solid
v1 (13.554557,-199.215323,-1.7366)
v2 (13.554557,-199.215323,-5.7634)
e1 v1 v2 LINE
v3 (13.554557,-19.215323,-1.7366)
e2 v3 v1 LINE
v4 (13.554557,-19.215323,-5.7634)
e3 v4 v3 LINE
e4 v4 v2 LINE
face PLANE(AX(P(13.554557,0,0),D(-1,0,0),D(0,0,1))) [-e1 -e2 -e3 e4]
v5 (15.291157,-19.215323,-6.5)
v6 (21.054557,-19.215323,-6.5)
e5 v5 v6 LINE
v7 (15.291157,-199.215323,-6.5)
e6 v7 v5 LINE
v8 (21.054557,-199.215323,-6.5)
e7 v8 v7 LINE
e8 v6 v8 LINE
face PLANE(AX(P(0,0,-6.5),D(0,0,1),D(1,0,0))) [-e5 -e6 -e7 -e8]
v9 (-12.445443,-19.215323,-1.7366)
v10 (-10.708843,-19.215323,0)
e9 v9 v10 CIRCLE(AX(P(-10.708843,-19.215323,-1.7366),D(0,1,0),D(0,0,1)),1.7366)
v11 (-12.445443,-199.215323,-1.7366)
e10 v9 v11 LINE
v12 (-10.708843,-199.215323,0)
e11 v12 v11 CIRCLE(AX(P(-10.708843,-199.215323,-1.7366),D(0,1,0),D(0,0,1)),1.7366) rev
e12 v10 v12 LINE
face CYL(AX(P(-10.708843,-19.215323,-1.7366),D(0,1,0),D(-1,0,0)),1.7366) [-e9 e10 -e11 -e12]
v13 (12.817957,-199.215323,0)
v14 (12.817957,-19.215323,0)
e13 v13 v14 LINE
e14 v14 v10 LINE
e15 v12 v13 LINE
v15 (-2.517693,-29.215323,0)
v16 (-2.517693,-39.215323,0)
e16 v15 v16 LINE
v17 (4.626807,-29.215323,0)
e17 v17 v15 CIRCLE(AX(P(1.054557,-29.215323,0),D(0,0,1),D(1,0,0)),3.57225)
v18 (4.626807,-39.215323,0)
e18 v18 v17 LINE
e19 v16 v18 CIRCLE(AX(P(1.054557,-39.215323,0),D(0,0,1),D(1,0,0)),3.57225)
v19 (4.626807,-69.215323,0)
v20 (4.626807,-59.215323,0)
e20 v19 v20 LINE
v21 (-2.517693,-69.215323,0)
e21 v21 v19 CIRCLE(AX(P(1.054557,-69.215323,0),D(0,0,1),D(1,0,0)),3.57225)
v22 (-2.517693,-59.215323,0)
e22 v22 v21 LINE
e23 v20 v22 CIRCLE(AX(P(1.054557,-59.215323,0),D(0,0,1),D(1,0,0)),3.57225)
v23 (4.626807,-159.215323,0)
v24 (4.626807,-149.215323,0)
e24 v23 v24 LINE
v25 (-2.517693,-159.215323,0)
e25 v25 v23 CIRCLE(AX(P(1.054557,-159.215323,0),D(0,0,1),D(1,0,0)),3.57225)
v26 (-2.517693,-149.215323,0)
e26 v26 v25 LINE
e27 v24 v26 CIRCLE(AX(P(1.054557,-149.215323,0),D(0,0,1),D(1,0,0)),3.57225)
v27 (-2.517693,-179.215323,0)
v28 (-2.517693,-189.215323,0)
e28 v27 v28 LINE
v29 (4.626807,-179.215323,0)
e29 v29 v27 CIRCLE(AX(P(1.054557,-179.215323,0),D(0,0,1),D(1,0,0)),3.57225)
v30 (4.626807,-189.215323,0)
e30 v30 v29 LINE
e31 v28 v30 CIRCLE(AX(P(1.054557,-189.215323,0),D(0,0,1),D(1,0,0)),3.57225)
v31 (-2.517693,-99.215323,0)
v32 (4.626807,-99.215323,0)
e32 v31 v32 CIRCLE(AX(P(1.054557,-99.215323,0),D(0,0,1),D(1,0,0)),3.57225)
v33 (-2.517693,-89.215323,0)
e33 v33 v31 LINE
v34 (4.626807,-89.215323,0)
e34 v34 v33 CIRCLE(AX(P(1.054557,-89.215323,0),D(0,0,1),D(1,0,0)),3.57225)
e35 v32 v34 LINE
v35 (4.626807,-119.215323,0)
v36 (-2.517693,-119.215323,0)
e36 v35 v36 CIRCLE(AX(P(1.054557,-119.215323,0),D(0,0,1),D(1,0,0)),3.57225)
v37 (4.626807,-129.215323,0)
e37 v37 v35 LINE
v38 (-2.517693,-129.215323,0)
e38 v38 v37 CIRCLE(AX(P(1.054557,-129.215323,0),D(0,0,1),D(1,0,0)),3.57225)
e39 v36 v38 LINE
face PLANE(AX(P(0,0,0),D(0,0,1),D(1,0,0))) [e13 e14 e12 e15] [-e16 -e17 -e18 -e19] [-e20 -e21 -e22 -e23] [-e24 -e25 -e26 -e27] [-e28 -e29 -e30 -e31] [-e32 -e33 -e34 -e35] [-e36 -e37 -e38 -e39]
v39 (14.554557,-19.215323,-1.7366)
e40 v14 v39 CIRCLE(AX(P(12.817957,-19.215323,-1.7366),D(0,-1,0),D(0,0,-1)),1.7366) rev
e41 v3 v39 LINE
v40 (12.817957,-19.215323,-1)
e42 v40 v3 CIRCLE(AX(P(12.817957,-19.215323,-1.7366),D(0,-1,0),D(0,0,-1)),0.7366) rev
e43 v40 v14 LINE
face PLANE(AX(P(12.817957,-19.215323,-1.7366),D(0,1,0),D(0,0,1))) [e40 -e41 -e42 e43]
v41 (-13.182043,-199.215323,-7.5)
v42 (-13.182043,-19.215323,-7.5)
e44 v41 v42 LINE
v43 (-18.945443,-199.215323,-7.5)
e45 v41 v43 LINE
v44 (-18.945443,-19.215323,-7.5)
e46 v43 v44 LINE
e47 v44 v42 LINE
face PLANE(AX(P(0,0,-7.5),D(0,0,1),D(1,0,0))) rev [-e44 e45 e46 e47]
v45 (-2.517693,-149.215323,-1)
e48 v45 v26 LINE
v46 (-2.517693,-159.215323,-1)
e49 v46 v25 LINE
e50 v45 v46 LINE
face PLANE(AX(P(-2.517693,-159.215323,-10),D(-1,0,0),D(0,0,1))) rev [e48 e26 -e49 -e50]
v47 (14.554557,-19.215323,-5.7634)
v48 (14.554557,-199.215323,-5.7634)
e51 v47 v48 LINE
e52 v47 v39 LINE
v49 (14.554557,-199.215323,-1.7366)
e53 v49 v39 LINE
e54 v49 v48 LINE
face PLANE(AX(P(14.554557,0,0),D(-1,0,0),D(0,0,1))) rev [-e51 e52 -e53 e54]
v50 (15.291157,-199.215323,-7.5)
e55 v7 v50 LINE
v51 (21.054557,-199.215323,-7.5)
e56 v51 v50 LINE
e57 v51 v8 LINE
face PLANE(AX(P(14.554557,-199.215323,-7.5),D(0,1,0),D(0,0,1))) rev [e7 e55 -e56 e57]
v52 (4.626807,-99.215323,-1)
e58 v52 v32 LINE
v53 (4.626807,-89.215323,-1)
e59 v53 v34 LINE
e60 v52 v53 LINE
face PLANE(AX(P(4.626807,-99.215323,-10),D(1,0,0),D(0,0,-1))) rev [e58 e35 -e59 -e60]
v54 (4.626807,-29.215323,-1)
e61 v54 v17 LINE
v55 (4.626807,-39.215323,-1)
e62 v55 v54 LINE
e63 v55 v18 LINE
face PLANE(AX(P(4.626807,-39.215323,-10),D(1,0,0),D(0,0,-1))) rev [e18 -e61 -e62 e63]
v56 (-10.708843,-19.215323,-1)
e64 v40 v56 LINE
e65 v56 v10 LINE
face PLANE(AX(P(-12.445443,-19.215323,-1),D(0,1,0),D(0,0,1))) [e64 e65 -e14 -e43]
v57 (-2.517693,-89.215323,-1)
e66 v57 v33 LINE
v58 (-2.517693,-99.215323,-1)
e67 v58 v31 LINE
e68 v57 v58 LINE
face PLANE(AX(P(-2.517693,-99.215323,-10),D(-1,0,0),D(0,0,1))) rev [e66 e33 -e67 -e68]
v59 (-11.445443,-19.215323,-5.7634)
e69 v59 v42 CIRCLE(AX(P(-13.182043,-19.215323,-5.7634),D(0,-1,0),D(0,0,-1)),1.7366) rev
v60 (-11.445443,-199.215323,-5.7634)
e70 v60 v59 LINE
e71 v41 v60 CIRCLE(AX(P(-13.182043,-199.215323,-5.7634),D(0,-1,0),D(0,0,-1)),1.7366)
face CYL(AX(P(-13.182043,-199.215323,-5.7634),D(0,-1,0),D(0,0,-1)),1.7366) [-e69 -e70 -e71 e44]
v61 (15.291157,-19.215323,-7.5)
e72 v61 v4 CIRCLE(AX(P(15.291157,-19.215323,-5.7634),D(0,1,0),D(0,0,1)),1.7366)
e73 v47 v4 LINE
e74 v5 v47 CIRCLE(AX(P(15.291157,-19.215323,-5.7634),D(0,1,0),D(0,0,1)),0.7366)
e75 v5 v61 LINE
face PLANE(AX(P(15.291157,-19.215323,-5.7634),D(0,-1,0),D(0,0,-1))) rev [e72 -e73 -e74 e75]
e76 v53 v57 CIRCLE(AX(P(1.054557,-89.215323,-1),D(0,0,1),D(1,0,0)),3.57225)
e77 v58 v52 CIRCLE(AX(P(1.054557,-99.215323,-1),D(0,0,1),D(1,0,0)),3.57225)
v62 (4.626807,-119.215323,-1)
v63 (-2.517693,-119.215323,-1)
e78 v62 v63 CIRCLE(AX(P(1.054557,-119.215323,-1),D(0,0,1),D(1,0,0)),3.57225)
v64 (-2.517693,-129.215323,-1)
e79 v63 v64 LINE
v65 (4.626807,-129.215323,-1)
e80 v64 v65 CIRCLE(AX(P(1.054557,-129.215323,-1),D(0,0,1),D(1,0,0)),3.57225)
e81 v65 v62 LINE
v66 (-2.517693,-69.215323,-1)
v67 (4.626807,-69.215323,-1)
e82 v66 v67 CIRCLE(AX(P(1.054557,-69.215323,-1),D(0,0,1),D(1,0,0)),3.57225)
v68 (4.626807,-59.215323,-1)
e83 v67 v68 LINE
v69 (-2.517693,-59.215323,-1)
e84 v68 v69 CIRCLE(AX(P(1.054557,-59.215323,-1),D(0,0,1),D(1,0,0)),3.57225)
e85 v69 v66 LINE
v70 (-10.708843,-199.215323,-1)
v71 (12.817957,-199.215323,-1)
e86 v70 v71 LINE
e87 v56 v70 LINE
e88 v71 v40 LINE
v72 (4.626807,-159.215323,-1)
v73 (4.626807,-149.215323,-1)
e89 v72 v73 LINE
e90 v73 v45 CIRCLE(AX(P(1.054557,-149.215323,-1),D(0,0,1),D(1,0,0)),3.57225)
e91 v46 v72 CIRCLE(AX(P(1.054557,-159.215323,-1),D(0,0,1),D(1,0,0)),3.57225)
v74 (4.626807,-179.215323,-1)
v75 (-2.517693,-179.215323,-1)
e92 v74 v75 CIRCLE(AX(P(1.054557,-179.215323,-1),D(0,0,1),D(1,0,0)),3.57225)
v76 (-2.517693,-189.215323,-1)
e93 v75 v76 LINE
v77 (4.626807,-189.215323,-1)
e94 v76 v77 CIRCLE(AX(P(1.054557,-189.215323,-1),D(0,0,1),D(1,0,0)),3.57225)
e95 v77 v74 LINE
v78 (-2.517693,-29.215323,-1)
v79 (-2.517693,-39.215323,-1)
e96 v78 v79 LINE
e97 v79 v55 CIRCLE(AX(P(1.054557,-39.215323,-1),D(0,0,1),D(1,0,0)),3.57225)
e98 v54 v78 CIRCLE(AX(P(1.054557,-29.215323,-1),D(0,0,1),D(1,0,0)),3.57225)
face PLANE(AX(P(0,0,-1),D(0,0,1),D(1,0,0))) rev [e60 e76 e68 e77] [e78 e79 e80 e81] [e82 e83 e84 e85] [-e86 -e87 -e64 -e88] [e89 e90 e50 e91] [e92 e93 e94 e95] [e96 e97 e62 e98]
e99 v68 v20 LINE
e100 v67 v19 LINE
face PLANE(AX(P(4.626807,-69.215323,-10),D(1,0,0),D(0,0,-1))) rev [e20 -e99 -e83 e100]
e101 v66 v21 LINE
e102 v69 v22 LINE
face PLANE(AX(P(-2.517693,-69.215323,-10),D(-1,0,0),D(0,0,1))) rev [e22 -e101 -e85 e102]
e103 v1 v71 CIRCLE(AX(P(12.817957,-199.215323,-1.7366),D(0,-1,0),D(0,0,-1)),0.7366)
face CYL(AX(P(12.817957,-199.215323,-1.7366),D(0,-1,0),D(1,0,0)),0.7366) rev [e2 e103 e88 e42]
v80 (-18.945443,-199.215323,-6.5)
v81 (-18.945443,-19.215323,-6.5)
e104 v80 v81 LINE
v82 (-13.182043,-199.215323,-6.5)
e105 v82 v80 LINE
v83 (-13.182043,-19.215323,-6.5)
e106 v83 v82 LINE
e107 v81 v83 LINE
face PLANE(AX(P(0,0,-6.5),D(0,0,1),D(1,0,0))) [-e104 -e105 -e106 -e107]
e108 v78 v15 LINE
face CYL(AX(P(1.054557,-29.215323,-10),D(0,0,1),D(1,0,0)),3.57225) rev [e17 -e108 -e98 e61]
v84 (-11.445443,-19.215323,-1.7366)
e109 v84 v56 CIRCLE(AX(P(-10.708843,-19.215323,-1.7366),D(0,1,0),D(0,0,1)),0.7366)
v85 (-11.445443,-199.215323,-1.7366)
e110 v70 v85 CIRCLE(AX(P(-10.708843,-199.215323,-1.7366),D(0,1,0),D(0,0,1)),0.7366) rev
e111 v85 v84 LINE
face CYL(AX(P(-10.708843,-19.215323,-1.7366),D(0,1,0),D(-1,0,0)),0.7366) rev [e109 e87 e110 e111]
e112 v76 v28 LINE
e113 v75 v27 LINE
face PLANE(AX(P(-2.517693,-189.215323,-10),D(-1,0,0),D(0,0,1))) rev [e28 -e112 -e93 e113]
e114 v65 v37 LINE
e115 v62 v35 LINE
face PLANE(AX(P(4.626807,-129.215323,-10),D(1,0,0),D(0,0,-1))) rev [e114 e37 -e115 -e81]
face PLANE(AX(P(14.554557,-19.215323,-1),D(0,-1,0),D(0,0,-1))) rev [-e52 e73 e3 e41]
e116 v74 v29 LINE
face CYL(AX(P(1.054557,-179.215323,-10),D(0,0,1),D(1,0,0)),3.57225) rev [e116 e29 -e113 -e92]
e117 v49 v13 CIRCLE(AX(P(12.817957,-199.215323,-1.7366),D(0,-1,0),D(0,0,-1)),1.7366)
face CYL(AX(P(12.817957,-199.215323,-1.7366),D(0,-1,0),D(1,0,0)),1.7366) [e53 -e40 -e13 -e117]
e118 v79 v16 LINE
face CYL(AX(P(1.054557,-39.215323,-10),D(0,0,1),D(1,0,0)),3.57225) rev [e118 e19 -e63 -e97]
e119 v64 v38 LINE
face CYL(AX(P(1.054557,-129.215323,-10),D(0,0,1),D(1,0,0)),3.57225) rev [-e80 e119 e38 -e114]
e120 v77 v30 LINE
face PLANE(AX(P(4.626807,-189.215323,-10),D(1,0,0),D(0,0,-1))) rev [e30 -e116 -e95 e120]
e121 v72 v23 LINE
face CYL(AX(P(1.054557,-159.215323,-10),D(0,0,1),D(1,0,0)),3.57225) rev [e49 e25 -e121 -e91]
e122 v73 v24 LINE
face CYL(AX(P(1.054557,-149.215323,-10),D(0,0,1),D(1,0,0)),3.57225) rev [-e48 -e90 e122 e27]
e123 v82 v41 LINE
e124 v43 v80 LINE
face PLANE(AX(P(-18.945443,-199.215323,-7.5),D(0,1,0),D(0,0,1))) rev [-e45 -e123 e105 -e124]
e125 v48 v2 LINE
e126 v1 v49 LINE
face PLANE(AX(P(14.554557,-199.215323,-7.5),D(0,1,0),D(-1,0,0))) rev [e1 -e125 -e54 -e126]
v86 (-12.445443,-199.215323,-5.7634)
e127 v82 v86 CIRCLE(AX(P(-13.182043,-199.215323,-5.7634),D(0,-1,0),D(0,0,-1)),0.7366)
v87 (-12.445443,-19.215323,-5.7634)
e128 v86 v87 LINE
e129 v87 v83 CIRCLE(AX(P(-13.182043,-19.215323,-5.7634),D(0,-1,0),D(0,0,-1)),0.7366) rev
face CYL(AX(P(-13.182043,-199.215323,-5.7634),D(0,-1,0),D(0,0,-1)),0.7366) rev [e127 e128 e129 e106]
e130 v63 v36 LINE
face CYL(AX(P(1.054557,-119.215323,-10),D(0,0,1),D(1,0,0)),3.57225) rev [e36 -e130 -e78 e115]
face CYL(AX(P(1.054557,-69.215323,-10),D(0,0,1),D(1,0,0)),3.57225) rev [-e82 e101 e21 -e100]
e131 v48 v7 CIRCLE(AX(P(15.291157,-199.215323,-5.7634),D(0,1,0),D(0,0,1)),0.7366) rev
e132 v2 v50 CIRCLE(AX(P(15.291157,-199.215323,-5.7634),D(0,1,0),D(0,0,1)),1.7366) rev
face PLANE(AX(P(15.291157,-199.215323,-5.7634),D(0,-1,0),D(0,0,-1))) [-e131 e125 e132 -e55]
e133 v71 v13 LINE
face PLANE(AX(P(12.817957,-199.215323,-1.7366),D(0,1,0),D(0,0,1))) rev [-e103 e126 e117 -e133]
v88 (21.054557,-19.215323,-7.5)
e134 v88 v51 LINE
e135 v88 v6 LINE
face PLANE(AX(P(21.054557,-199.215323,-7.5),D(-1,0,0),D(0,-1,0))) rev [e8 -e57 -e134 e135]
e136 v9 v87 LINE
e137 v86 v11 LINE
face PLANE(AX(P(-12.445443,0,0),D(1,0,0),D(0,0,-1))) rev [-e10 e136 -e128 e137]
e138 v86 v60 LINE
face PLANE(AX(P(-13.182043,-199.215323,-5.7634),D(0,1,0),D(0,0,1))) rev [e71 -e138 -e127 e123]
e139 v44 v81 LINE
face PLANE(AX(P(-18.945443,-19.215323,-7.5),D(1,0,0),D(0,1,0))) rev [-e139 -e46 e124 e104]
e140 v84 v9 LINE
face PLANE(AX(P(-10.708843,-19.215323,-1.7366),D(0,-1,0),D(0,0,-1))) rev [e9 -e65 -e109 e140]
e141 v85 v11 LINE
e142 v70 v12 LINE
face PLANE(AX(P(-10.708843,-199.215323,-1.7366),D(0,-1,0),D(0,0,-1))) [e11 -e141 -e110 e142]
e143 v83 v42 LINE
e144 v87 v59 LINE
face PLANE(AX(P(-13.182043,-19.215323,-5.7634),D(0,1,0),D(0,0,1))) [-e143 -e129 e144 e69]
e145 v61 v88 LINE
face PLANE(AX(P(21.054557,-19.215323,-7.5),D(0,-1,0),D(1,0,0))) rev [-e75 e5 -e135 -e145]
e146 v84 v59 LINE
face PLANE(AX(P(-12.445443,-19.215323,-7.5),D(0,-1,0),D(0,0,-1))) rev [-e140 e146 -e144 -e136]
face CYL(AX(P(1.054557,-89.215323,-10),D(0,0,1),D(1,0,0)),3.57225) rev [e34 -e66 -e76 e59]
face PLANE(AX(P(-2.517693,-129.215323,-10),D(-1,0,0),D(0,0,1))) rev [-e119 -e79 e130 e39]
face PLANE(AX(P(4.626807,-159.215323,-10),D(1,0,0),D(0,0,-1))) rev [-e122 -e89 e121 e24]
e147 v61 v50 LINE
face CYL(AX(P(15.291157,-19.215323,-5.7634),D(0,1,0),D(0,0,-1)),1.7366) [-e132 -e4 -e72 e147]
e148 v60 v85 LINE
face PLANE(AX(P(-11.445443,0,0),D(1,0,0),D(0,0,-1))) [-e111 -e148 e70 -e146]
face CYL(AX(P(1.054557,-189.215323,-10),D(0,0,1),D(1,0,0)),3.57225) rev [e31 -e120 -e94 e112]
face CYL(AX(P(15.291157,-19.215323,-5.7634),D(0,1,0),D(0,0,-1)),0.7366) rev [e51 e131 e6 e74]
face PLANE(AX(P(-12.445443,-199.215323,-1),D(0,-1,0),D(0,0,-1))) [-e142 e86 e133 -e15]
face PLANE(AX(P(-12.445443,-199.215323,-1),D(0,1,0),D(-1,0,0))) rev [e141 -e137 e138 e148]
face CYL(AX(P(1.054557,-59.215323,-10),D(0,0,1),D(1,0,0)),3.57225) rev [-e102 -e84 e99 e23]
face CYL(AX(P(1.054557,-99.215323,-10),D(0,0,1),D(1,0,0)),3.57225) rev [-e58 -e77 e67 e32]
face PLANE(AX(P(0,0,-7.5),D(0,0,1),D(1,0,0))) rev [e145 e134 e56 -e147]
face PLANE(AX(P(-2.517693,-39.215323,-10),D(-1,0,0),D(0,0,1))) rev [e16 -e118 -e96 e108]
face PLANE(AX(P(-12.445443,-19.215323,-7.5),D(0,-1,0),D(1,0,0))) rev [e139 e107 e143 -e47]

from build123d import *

# Parameters (mm, degrees)
SKETCH_2_W                         = 27
SKETCH_2_H                         = 180
SM_BASE_FLANGE_1_DEPTH             = 1
SM_EDGE_FLANGE_1_STRIP_W           = 5.4732
SM_EDGE_FLANGE_1_STRIP_H           = 1
SM_EDGE_FLANGE_1_STRIP_CUT_DEPTH   = 180
SM_EDGE_FLANGE_1_STRIP_2_W         = 5.4732
SM_EDGE_FLANGE_1_STRIP_2_H         = 1
SM_EDGE_FLANGE_1_STRIP_CUT_2_DEPTH = 180
SM_EDGE_FLANGE_1_DEPTH             = 180
SM_EDGE_FLANGE_1_BEND_DEPTH        = 180
SM_EDGE_FLANGE_2_STRIP_W           = 5.4732
SM_EDGE_FLANGE_2_STRIP_H           = 1
SM_EDGE_FLANGE_2_STRIP_CUT_DEPTH   = 180
SM_EDGE_FLANGE_2_STRIP_2_W         = 5.4732
SM_EDGE_FLANGE_2_STRIP_2_H         = 1
SM_EDGE_FLANGE_2_STRIP_CUT_2_DEPTH = 180
SM_EDGE_FLANGE_2_DEPTH             = 180
SM_EDGE_FLANGE_2_BEND_DEPTH        = 180
CUT_EXTRUDE_3_DEPTH                = 10
PATTERN_LINEAR_1_COUNT             = 9
PATTERN_LINEAR_1_PITCH             = 30


# Sheet-metal steps are written as plain solids
with BuildPart() as part:
    # 草图2 → 基体-法兰1 (new body)
    with BuildSketch(Plane.XY):
        with Locations((1.054557063, -109.215322961)):
            Rectangle(SKETCH_2_W, SKETCH_2_H)
    extrude(amount=-SM_BASE_FLANGE_1_DEPTH)

    # 边线-法兰1 strip (across the edge) → 边线-法兰1 strip cut (cut)
    with BuildSketch(Plane(origin=(-12.445442937, -199.215322961, -1), x_dir=(1, 0, 0), z_dir=(0, 1, 0))):
        with Locations((-1, -0.5)):
            Rectangle(SM_EDGE_FLANGE_1_STRIP_W, SM_EDGE_FLANGE_1_STRIP_H)
    extrude(amount=SM_EDGE_FLANGE_1_STRIP_CUT_DEPTH, mode=Mode.SUBTRACT)

    # 边线-法兰1 strip 2 (across the edge) → 边线-法兰1 strip cut 2 (cut)
    with BuildSketch(Plane(origin=(14.554557063, -19.215322961, -1), x_dir=(-1, 0, 0), z_dir=(0, -1, 0))):
        with Locations((-1, -0.5)):
            Rectangle(SM_EDGE_FLANGE_1_STRIP_2_W, SM_EDGE_FLANGE_1_STRIP_2_H)
    extrude(amount=SM_EDGE_FLANGE_1_STRIP_CUT_2_DEPTH, mode=Mode.SUBTRACT)

    # 边线-法兰1 section (across the edge) → 边线-法兰1 (add)
    with BuildSketch(Plane(origin=(-12.445442937, -199.215322961, -1), x_dir=(1, 0, 0), z_dir=(0, 1, 0))):
        with BuildLine():
            Line((0, 0.7366), (0, 6.5))
            Line((0, 6.5), (1, 6.5))
            Line((1, 6.5), (1, 0.7366))
            ThreePointArc((1, 0.7366), (1.215745145, 0.215745145), (1.7366, 0))
            Line((1.7366, 0), (1.7366, -1))
            ThreePointArc((1.7366, -1), (0.508638364, -0.491361636), (0, 0.7366))
        make_face()
    extrude(amount=SM_EDGE_FLANGE_1_DEPTH)

    # 边线-法兰1 section 2 (across the edge) → 边线-法兰1 bend (add)
    with BuildSketch(Plane(origin=(14.554557063, -19.215322961, -1), x_dir=(-1, 0, 0), z_dir=(0, -1, 0))):
        with BuildLine():
            Line((0, 0.7366), (0, 6.5))
            Line((0, 6.5), (1, 6.5))
            Line((1, 6.5), (1, 0.7366))
            ThreePointArc((1, 0.7366), (1.215745145, 0.215745145), (1.7366, 0))
            Line((1.7366, 0), (1.7366, -1))
            ThreePointArc((1.7366, -1), (0.508638364, -0.491361636), (0, 0.7366))
        make_face()
    extrude(amount=SM_EDGE_FLANGE_1_BEND_DEPTH)

    # 边线-法兰2 strip (across the edge) → 边线-法兰2 strip cut (cut)
    with BuildSketch(Plane(origin=(-12.445442937, -19.215322961, -7.5), x_dir=(0, 0, 1), z_dir=(0, -1, 0))):
        with Locations((-1, -0.5)):
            Rectangle(SM_EDGE_FLANGE_2_STRIP_W, SM_EDGE_FLANGE_2_STRIP_H)
    extrude(amount=SM_EDGE_FLANGE_2_STRIP_CUT_DEPTH, mode=Mode.SUBTRACT)

    # 边线-法兰2 strip 2 (across the edge) → 边线-法兰2 strip cut 2 (cut)
    with BuildSketch(Plane(origin=(14.554557063, -199.215322961, -7.5), x_dir=(0, 0, 1), z_dir=(0, 1, 0))):
        with Locations((-1, -0.5)):
            Rectangle(SM_EDGE_FLANGE_2_STRIP_2_W, SM_EDGE_FLANGE_2_STRIP_2_H)
    extrude(amount=SM_EDGE_FLANGE_2_STRIP_CUT_2_DEPTH, mode=Mode.SUBTRACT)

    # 边线-法兰2 section (across the edge) → 边线-法兰2 (add)
    with BuildSketch(Plane(origin=(-12.445442937, -19.215322961, -7.5), x_dir=(0, 0, 1), z_dir=(0, -1, 0))):
        with BuildLine():
            Line((0, 0.7366), (0, 6.5))
            Line((0, 6.5), (1, 6.5))
            Line((1, 6.5), (1, 0.7366))
            ThreePointArc((1, 0.7366), (1.215745145, 0.215745145), (1.7366, 0))
            Line((1.7366, 0), (1.7366, -1))
            ThreePointArc((1.7366, -1), (0.508638364, -0.491361636), (0, 0.7366))
        make_face()
    extrude(amount=SM_EDGE_FLANGE_2_DEPTH)

    # 边线-法兰2 section 2 (across the edge) → 边线-法兰2 bend (add)
    with BuildSketch(Plane(origin=(14.554557063, -199.215322961, -7.5), x_dir=(0, 0, 1), z_dir=(0, 1, 0))):
        with BuildLine():
            Line((0, 0.7366), (0, 6.5))
            Line((0, 6.5), (1, 6.5))
            Line((1, 6.5), (1, 0.7366))
            ThreePointArc((1, 0.7366), (1.215745145, 0.215745145), (1.7366, 0))
            Line((1.7366, 0), (1.7366, -1))
            ThreePointArc((1.7366, -1), (0.508638364, -0.491361636), (0, 0.7366))
        make_face()
    extrude(amount=SM_EDGE_FLANGE_2_BEND_DEPTH)

    # 草图17 → 切除-拉伸3 (cut)
    with BuildSketch(Plane.XY):
        with BuildLine():
            Line((4.626807443, -189.215322961), (4.626807443, -179.215322961))
            ThreePointArc((4.626807443, -179.215322961), (1.054557063, -175.643072581), (-2.517693316, -179.215322961))
            Line((-2.517693316, -179.215322961), (-2.517693316, -189.215322961))
            ThreePointArc((-2.517693316, -189.215322961), (1.054557063, -192.78757334), (4.626807443, -189.215322961))
        make_face()
    cut_extrude_3 = extrude(amount=-CUT_EXTRUDE_3_DEPTH, mode=Mode.SUBTRACT)

    # 阵列(线性)1: 切除-拉伸3 ×9
    with Locations(*[(0, i * PATTERN_LINEAR_1_PITCH, 0) for i in range(1, PATTERN_LINEAR_1_COUNT)]):
        add(cut_extrude_3, mode=Mode.SUBTRACT)


solid = part.part
